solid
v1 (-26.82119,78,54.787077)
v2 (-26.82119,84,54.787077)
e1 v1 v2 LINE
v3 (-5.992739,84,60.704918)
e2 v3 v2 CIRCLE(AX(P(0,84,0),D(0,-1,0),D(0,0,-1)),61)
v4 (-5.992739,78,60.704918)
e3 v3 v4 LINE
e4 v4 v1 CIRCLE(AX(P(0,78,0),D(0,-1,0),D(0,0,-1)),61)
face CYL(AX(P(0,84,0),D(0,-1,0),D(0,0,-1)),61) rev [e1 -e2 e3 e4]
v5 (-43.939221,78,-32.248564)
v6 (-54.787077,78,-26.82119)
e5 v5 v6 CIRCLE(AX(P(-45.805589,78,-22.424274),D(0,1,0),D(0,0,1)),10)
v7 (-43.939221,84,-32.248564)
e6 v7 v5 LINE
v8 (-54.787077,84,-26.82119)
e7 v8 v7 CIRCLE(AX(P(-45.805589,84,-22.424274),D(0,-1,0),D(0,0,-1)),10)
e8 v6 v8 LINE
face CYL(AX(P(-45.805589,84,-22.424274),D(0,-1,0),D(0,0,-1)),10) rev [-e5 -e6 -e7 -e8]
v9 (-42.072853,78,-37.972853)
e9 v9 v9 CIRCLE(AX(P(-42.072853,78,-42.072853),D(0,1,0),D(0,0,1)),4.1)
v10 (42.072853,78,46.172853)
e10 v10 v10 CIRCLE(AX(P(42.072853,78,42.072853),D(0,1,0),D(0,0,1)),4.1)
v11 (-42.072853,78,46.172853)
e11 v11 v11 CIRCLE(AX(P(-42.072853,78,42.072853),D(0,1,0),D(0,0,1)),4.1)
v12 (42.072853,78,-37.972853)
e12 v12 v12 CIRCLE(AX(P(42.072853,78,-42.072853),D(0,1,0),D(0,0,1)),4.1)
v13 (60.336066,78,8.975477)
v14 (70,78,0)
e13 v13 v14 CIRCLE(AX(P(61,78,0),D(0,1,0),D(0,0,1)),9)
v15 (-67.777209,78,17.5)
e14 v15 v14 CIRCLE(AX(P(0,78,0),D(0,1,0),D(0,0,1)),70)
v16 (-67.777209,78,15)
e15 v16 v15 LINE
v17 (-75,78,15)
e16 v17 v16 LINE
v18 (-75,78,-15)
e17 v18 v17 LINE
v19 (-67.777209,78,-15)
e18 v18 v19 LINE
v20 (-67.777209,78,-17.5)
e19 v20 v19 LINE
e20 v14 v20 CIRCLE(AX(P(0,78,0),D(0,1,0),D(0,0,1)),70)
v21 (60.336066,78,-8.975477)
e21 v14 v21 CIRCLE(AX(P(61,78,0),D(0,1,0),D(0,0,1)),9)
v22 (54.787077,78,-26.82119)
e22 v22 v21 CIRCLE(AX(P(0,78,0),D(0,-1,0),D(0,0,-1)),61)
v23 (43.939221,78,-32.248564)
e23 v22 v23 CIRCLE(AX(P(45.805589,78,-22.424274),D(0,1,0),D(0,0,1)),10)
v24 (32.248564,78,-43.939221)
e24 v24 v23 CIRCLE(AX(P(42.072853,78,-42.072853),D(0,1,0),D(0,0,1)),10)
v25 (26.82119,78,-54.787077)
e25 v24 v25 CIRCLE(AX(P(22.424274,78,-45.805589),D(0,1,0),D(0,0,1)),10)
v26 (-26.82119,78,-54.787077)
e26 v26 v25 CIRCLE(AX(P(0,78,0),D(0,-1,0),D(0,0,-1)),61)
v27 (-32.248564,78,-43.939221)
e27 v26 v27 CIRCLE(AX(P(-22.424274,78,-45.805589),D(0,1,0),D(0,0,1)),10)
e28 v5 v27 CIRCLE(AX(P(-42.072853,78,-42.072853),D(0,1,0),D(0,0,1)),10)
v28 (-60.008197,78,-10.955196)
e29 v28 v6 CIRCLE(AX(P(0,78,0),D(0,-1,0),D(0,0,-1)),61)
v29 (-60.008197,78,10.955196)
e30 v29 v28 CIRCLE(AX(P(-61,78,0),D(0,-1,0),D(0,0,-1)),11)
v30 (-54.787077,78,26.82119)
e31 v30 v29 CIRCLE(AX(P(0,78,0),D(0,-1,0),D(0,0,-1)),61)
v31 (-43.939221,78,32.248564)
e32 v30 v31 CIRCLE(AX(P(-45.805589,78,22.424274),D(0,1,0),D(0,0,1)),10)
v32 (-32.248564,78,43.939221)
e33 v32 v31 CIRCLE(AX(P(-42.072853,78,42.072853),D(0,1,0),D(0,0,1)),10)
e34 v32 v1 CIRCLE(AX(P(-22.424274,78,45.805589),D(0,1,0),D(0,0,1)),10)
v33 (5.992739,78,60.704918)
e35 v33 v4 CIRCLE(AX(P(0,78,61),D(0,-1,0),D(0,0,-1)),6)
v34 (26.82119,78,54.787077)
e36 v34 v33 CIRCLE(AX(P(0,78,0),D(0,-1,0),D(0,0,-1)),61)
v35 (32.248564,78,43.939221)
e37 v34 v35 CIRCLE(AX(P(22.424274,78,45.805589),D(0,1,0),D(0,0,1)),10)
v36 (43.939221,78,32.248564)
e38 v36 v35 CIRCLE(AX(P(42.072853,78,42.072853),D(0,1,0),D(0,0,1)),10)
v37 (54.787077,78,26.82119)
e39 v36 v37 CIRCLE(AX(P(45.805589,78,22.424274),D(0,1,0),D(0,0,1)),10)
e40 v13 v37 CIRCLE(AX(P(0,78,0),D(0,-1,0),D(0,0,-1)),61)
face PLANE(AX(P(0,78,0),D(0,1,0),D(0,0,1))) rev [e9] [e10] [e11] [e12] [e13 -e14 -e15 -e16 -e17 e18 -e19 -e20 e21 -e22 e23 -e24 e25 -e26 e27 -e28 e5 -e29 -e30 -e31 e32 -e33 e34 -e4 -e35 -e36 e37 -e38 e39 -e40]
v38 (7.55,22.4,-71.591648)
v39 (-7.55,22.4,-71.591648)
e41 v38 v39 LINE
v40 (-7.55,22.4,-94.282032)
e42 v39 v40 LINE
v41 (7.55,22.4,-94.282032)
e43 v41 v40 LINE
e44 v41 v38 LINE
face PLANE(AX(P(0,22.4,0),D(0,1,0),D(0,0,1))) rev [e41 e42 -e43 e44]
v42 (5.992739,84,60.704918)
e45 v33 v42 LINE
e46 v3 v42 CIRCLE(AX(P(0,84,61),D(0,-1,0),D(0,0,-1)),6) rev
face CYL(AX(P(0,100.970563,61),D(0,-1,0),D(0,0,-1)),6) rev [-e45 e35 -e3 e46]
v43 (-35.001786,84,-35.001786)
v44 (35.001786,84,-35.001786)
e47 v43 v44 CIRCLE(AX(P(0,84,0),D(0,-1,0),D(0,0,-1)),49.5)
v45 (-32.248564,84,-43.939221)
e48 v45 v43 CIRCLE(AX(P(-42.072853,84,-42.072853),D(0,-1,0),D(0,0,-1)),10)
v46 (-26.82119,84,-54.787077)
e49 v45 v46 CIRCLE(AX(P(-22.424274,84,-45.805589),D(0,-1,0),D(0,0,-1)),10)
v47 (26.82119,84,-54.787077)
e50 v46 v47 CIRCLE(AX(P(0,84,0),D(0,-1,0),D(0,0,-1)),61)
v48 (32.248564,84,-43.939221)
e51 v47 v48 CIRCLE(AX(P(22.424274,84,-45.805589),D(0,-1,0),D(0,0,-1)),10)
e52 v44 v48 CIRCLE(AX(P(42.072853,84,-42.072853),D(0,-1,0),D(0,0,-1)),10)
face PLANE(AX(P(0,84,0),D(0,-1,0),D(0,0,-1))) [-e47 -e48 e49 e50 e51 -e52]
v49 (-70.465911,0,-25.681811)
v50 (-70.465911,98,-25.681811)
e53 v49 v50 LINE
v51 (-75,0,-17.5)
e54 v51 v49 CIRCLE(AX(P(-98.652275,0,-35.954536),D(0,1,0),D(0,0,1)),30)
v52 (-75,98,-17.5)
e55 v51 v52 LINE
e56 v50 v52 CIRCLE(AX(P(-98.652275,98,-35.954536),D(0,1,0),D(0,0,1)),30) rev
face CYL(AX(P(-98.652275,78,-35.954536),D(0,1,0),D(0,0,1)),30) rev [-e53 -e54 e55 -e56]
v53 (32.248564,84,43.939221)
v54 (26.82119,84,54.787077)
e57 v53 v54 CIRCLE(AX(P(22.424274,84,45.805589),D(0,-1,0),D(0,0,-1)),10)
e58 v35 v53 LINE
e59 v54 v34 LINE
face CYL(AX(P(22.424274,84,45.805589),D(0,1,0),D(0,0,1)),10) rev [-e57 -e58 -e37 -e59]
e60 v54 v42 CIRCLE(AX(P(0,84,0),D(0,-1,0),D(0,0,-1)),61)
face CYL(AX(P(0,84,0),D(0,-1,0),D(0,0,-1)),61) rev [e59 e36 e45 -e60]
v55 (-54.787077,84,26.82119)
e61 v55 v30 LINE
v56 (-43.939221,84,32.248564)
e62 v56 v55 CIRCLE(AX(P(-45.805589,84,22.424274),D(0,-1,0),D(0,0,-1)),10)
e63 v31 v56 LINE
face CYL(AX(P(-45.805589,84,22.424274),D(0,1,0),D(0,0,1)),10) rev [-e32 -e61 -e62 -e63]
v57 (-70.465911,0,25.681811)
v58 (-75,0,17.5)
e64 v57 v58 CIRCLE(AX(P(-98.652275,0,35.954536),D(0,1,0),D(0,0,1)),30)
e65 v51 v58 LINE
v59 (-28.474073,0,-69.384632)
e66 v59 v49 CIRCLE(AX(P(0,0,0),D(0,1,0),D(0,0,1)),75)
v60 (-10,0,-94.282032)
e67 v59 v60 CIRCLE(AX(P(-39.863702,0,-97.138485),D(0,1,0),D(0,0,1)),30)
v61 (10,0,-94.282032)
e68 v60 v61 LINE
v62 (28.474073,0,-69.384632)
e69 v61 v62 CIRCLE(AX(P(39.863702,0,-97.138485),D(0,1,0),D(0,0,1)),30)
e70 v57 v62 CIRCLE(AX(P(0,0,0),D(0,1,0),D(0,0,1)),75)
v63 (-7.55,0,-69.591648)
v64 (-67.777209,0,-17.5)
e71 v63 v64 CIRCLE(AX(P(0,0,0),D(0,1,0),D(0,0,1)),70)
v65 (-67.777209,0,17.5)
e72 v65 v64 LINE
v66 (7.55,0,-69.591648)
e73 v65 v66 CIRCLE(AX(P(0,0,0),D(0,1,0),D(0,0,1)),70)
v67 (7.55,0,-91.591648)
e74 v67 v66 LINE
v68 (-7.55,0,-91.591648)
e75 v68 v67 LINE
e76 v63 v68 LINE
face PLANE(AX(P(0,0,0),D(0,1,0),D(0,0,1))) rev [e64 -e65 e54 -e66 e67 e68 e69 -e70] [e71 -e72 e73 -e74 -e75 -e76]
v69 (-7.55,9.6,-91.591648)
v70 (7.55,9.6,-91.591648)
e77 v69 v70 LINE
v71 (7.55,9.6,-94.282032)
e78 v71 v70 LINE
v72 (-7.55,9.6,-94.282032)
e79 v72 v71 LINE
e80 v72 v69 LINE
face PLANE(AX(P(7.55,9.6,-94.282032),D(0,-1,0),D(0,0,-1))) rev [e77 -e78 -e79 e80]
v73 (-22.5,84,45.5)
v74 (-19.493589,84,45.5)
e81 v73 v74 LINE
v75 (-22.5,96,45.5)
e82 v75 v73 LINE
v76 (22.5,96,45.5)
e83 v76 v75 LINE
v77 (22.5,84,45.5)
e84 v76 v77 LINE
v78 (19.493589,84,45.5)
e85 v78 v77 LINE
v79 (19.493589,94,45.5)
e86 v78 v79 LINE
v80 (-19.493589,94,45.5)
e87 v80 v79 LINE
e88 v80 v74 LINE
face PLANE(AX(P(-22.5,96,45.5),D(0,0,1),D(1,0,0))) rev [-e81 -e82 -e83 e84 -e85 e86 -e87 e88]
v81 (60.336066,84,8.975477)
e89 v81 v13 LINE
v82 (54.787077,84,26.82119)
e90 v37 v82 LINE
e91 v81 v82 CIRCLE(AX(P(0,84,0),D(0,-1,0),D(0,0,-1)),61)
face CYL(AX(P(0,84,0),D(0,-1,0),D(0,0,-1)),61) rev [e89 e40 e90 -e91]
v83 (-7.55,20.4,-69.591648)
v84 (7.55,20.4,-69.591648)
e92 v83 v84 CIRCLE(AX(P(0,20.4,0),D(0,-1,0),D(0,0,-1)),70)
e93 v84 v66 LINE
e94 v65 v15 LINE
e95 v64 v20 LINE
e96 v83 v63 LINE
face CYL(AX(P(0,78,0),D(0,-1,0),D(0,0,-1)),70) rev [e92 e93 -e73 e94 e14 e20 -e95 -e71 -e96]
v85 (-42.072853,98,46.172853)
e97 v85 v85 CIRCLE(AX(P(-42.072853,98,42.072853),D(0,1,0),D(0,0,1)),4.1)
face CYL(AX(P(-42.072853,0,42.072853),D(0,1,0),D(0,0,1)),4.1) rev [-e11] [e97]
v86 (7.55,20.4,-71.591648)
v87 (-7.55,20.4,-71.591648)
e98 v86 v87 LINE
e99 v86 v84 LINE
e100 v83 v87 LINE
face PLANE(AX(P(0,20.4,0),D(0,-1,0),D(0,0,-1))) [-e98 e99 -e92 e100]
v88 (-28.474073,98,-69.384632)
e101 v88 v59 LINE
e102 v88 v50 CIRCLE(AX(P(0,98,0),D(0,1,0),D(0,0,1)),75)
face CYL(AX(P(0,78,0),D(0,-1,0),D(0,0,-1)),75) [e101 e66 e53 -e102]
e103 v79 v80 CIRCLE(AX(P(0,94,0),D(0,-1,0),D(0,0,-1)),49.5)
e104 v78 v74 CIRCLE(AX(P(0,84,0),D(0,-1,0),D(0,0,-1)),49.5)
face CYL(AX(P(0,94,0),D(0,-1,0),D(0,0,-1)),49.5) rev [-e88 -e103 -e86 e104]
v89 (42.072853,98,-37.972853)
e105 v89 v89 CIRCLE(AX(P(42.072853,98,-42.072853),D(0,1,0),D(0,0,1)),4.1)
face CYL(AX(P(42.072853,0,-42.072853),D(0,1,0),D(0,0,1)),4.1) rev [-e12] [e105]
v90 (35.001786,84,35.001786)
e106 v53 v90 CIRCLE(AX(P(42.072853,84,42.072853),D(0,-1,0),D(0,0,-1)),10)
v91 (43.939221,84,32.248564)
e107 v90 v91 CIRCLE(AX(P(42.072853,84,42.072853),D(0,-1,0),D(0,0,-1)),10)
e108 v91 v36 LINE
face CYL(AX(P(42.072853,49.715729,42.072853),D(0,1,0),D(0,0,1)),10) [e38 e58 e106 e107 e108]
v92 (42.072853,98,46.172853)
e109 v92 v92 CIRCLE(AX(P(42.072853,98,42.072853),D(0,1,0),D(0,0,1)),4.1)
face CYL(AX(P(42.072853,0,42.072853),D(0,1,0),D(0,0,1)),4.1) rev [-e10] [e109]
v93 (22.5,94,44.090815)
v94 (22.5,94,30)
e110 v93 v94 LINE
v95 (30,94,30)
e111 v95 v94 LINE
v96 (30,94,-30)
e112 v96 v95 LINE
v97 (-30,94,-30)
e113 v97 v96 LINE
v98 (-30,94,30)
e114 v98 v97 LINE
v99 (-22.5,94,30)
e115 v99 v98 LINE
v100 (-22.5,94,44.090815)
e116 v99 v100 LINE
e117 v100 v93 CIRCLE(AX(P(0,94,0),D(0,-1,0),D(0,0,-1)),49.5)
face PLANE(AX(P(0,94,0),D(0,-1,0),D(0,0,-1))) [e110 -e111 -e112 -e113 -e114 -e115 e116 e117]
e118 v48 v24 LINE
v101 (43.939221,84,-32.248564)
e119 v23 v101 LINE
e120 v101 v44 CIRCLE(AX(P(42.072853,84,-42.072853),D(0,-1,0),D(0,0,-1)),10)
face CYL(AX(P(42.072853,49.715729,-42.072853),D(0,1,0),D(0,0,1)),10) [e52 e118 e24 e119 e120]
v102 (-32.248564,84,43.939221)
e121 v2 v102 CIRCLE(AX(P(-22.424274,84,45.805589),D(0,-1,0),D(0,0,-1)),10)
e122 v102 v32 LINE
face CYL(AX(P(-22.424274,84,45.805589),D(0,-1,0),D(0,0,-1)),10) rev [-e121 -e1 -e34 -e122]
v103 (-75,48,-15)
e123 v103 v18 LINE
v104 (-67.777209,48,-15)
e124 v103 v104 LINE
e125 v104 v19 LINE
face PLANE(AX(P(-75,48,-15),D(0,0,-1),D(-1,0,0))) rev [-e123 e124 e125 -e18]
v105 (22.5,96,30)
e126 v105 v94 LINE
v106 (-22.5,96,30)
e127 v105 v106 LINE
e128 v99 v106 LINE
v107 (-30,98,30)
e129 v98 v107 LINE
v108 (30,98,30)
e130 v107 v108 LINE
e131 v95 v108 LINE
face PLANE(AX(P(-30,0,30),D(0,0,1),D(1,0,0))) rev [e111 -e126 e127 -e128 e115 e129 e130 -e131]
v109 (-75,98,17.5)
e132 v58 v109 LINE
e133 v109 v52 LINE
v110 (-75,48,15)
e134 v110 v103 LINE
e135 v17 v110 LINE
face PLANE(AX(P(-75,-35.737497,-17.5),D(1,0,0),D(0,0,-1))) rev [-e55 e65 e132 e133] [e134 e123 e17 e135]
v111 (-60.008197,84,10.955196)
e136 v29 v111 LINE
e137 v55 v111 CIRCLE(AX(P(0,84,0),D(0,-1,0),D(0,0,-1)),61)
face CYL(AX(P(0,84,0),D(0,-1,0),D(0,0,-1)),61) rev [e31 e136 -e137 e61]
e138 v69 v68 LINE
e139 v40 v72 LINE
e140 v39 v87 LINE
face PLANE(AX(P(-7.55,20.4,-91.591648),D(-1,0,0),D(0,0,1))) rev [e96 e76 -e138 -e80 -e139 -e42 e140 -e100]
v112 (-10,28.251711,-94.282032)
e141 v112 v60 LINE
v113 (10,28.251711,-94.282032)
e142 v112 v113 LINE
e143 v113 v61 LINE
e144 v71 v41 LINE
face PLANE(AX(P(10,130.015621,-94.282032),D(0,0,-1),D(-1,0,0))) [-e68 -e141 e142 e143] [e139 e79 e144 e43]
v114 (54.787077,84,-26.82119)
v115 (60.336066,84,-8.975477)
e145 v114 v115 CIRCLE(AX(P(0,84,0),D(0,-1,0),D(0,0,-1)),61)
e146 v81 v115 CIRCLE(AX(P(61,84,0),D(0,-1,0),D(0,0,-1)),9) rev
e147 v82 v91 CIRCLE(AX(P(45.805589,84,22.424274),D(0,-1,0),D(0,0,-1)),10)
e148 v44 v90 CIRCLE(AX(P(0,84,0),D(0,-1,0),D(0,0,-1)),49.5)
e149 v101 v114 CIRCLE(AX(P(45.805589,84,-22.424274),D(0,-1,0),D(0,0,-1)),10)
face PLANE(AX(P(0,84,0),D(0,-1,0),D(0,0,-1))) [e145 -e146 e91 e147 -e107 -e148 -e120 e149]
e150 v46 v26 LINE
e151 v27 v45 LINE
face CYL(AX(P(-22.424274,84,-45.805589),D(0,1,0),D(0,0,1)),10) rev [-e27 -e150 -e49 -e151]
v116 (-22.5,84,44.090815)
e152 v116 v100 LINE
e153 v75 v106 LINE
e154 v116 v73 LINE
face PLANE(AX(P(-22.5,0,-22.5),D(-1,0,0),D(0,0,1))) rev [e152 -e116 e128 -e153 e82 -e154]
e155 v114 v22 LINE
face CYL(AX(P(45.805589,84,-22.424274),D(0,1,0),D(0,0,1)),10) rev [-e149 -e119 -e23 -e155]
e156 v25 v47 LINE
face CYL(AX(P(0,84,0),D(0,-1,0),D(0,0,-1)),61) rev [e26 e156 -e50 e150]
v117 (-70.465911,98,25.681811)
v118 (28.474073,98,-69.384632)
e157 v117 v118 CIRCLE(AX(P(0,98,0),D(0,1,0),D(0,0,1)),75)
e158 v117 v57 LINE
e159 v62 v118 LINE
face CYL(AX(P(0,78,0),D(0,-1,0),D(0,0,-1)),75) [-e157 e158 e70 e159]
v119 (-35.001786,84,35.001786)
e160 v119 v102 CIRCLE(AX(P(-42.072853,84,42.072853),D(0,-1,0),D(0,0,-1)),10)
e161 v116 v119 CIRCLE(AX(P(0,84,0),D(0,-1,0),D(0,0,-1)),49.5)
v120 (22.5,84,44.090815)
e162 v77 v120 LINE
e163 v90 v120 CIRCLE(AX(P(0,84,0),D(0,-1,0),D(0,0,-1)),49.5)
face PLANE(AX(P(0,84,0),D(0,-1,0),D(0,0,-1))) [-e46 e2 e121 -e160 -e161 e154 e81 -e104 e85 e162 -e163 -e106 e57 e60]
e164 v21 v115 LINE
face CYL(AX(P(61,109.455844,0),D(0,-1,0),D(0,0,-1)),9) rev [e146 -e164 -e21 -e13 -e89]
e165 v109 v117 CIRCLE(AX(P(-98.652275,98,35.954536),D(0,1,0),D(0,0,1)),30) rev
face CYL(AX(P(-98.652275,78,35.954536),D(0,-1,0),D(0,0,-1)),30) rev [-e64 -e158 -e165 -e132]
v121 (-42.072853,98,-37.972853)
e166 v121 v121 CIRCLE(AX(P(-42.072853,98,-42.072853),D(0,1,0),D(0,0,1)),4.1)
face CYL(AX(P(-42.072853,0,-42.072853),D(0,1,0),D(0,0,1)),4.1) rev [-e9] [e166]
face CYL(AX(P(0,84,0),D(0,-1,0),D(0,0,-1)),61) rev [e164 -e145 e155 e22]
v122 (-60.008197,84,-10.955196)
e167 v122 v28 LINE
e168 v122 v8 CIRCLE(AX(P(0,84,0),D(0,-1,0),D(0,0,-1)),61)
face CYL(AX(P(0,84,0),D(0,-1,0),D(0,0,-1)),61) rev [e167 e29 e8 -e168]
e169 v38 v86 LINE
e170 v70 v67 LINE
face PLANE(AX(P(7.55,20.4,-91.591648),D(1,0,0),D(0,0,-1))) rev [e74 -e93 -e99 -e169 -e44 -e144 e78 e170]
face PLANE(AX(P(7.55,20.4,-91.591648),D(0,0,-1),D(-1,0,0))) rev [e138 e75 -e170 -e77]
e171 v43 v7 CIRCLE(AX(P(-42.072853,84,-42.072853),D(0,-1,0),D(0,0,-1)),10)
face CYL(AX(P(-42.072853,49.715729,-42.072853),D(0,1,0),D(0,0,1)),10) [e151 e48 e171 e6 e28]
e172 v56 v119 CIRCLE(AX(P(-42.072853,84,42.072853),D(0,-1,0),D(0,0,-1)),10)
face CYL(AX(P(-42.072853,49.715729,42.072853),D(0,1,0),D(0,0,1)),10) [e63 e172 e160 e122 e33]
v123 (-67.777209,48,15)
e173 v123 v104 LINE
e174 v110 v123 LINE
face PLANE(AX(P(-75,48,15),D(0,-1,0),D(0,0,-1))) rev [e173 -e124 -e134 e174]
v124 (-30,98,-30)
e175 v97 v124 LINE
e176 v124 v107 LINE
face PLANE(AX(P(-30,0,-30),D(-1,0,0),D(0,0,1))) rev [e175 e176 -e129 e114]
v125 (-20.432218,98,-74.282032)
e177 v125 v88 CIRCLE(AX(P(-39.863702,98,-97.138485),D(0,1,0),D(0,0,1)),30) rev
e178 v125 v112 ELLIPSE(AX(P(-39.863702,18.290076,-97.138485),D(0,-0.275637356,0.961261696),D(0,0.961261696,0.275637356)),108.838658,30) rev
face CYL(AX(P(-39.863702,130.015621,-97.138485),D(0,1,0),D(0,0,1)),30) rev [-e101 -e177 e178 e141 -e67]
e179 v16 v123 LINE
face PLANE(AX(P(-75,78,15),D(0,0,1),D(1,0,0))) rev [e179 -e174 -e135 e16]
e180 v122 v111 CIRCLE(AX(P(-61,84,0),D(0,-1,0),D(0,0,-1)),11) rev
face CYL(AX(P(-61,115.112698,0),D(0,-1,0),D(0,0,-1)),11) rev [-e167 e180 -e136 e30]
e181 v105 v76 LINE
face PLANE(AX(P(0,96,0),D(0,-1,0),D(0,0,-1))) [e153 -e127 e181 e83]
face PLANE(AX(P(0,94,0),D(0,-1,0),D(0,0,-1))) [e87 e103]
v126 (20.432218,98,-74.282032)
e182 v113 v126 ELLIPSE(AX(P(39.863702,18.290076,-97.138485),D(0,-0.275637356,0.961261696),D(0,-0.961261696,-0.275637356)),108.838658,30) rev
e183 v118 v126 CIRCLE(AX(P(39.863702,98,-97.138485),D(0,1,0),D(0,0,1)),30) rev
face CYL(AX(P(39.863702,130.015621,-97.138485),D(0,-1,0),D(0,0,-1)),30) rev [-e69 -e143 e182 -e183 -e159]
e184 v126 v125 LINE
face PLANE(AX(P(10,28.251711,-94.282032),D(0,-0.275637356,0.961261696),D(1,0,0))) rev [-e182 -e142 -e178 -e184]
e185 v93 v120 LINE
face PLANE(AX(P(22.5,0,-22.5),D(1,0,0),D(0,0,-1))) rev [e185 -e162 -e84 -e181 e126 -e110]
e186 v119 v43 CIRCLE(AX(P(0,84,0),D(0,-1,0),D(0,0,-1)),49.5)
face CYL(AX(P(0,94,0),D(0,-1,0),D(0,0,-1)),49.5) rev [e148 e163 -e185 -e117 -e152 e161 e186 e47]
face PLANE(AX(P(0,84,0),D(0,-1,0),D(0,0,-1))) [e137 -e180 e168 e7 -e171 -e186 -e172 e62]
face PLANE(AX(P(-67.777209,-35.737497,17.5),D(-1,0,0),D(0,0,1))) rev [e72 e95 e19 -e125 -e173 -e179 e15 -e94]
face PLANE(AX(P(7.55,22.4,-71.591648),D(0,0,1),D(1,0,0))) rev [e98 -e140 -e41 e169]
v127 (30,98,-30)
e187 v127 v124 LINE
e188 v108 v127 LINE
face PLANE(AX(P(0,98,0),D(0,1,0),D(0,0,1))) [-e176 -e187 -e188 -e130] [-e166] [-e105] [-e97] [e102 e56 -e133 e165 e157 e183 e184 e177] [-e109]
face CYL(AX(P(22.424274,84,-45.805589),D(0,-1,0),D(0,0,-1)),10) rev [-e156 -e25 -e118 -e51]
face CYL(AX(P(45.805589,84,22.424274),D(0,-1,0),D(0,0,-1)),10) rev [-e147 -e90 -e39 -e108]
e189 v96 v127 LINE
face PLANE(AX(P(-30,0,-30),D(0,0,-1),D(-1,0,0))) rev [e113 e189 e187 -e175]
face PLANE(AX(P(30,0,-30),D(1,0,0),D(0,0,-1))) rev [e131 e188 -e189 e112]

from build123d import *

# Parameters (mm, degrees)
SKETCH1_R               = 75
SKETCH1_R_2             = 70
BOSS_EXTRUDE1_DEPTH     = 78
SKETCH2_R               = 75
BOSS_EXTRUDE2_DEPTH     = 20
SKETCH3_R               = 4.1
SKETCH3_W               = 45
SKETCH3_H               = 45
CUT_EXTRUDE1_DEPTH      = 145.409140985
SKETCH5_W               = 45
SKETCH5_H               = 23
CUT_EXTRUDE2_DEPTH      = 18
SKETCH6_R               = 61
CUT_EXTRUDE3_DEPTH      = 6
SKETCH7_R               = 10
SKETCH7_R_2             = 4.1
BOSS_EXTRUDE3_DEPTH     = 6
SKETCH8_R               = 49.5
CUT_EXTRUDE4_DEPTH      = 10
CUT_EXTRUDE5_DEPTH      = 145.409140985
CUT_EXTRUDE5_DEPTH_BACK = 145.409140985
SKETCH10_W              = 15
SKETCH10_H              = 12.8
CUT_EXTRUDE6_DEPTH      = 10
CUT_EXTRUDE7_START      = -3
SKETCH11_W              = 20
SKETCH11_H              = 20
CUT_EXTRUDE7_DEPTH      = 10
CUT_EXTRUDE9_DEPTH      = 132.658649545
CUT_EXTRUDE9_DEPTH_BACK = 6
SKETCH13_R              = 9
BOSS_EXTRUDE4_DEPTH     = 98
SKETCH15_W              = 15.1
SKETCH15_H              = 22
CUT_EXTRUDE10_DEPTH     = 20.4
FILLET1_R               = 30
SKETCH16_W              = 15.1
SKETCH16_H              = 20
CUT_EXTRUDE11_DEPTH     = 2
SKETCH17_W              = 15.1
SKETCH17_H              = 12.8
CUT_EXTRUDE12_DEPTH     = 208.32046993
CHAMFER1_SIZE           = 20
CHAMFER1_SIZE2          = 69.748288877
CUT_EXTRUDE13_START     = -20
SKETCH20_W              = 10
SKETCH20_H              = 30
CUT_EXTRUDE13_DEPTH     = 30
BOSS_EXTRUDE6_START     = -48.000001
SKETCH21_W              = 7.222791441
SKETCH21_H              = 35
BOSS_EXTRUDE6_DEPTH     = 98.000001
SKETCH22_W              = 30
SKETCH22_H              = 30
CUT_EXTRUDE15_DEPTH     = 198.176147378
FILLET2_R               = 30
SKETCH23_W              = 60
SKETCH23_H              = 60
CUT_EXTRUDE16_DEPTH     = 156.300037396
SKETCH25_R              = 6
CUT_EXTRUDE17_DEPTH     = 6
SKETCH26_R              = 11
CUT_EXTRUDE18_DEPTH     = 6
FILLET4_R               = 10


with BuildPart() as part:
    # Sketch1 → Boss-Extrude1 (new body)
    with BuildSketch(Plane(origin=(0, 0, 0), x_dir=(1, 0, 0), z_dir=(0, 1, 0))):
        with Locations(Location((0, 0, 0), (0, 0, 270))):
            Circle(SKETCH1_R)
        with Locations(Location((0, 0, 0), (0, 0, 270))):
            Circle(SKETCH1_R_2, mode=Mode.SUBTRACT)
    extrude(amount=BOSS_EXTRUDE1_DEPTH)

    # Sketch2 → Boss-Extrude2 (add)
    with BuildSketch(Plane(origin=(0, 78, 0), x_dir=(1, 0, 0), z_dir=(0, 1, 0))):
        with Locations(Location((0, 0, 0), (0, 0, 270))):
            Circle(SKETCH2_R)
    extrude(amount=BOSS_EXTRUDE2_DEPTH)

    # Sketch3 → Cut-Extrude1 (cut, through all)
    with BuildSketch(Plane(origin=(0, 98, 0), x_dir=(1, 0, 0), z_dir=(0, 1, 0))):
        with Locations(Location((-42.072853481, -42.072853481, 0), (0, 0, 270))):
            Circle(SKETCH3_R)
        with Locations(Location((-42.072853481, 42.072853481, 0), (0, 0, 270))):
            Circle(SKETCH3_R)
        with Locations(Location((42.072853481, 42.072853481, 0), (0, 0, 270))):
            Circle(SKETCH3_R)
        with Locations(Location((42.072853481, -42.072853481, 0), (0, 0, 270))):
            Circle(SKETCH3_R)
        Rectangle(SKETCH3_W, SKETCH3_H)
    extrude(amount=-CUT_EXTRUDE1_DEPTH, mode=Mode.SUBTRACT)

    # Sketch5 → Cut-Extrude2 (cut)
    with BuildSketch(Plane.XZ.offset(-78)):
        with Locations((0, 34)):
            Rectangle(SKETCH5_W, SKETCH5_H)
    extrude(amount=-CUT_EXTRUDE2_DEPTH, mode=Mode.SUBTRACT)

    # Sketch6 → Cut-Extrude3 (cut)
    with BuildSketch(Plane.XZ.offset(-78)):
        Circle(SKETCH6_R)
    extrude(amount=-CUT_EXTRUDE3_DEPTH, mode=Mode.SUBTRACT)

    # Sketch7 → Boss-Extrude3 (add)
    # profile 1 of 4: a face of its own
    with BuildSketch(Plane.XZ.offset(-84)):
        with Locations((-42.072853481, -42.072853481)):
            Circle(SKETCH7_R)
        with Locations(Location((-42.072853481, -42.072853481, 0), (0, 0, 90))):
            Circle(SKETCH7_R_2, mode=Mode.SUBTRACT)
    # profile 2 of 4: a face of its own
    with BuildSketch(Plane.XZ.offset(-84)):
        with Locations((-42.072853481, 42.072853481)):
            Circle(SKETCH7_R)
        with Locations(Location((-42.072853481, 42.072853481, 0), (0, 0, 90))):
            Circle(SKETCH7_R_2, mode=Mode.SUBTRACT)
    # profile 3 of 4: a face of its own
    with BuildSketch(Plane.XZ.offset(-84)):
        with Locations((42.072853481, -42.072853481)):
            Circle(SKETCH7_R)
        with Locations(Location((42.072853481, -42.072853481, 0), (0, 0, 90))):
            Circle(SKETCH7_R_2, mode=Mode.SUBTRACT)
    # profile 4 of 4: a face of its own
    with BuildSketch(Plane.XZ.offset(-84)):
        with Locations((42.072853481, 42.072853481)):
            Circle(SKETCH7_R)
        with Locations(Location((42.072853481, 42.072853481, 0), (0, 0, 90))):
            Circle(SKETCH7_R_2, mode=Mode.SUBTRACT)
    extrude(amount=BOSS_EXTRUDE3_DEPTH)

    # Sketch8 → Cut-Extrude4 (cut)
    with BuildSketch(Plane.XZ.offset(-84)):
        Circle(SKETCH8_R)
    extrude(amount=-CUT_EXTRUDE4_DEPTH, mode=Mode.SUBTRACT)

    # Sketch9 → Cut-Extrude5 (cut, two sides: drawn at the far end of the back side and taken through both)
    with BuildSketch(Plane.XZ.offset(-CUT_EXTRUDE5_DEPTH_BACK)):
        Polygon((359.222745321, -74.624057783), (7.5, -74.624057783), (-7.5, -74.624057783), (-359.222745321, -74.624057783), (-359.222745321, -778.069548425), (359.222745321, -778.069548425), align=None)
    extrude(amount=CUT_EXTRUDE5_DEPTH + CUT_EXTRUDE5_DEPTH_BACK, mode=Mode.SUBTRACT)

    # Sketch10 → Cut-Extrude6 (cut)
    with BuildSketch(Plane(origin=(0, 0, -74.624057783), x_dir=(-1, 0, 0), z_dir=(0, 0, -1))):
        with Locations((0, 14)):
            Rectangle(SKETCH10_W, SKETCH10_H)
    extrude(amount=-CUT_EXTRUDE6_DEPTH, mode=Mode.SUBTRACT)

    # Sketch11 → Cut-Extrude7 (cut)
    with BuildSketch(Plane(origin=(0, 0, -74.624057783), x_dir=(-1, 0, 0), z_dir=(0, 0, -1)).offset(CUT_EXTRUDE7_START)):
        with Locations((0, 14)):
            Rectangle(SKETCH11_W, SKETCH11_H)
    extrude(amount=-CUT_EXTRUDE7_DEPTH, mode=Mode.SUBTRACT)

    # Sketch13 → Cut-Extrude9 (cut, two sides: drawn at the far end of the back side and taken through both)
    with BuildSketch(Plane.XZ.offset(-78).offset(-CUT_EXTRUDE9_DEPTH_BACK)):
        with Locations((61, 0)):
            Circle(SKETCH13_R)
    extrude(amount=CUT_EXTRUDE9_DEPTH + CUT_EXTRUDE9_DEPTH_BACK, mode=Mode.SUBTRACT)

    # Sketch14 → Boss-Extrude4 (add)
    with BuildSketch(Plane.XZ):
        with BuildLine():
            Line((10, -94.282032303), (-10, -94.282032303))
            Line((-10, -94.282032303), (-10, -69.282032303))
            ThreePointArc((-10, -69.282032303), (0, -70), (10, -69.282032303))
            Line((10, -69.282032303), (10, -94.282032303))
        make_face()
    extrude(amount=-BOSS_EXTRUDE4_DEPTH)

    # Sketch15 → Cut-Extrude10 (cut)
    with BuildSketch(Plane.XZ):
        with Locations((0, -80.591648206)):
            Rectangle(SKETCH15_W, SKETCH15_H)
    extrude(amount=-CUT_EXTRUDE10_DEPTH, mode=Mode.SUBTRACT)

    # Fillet1
    # the kernel refuses this fillet: 30 mm, written as the material it adds along each edge
    with BuildSketch(Plane(origin=(10, 98, -74.330343737), x_dir=(0, 0, -1), z_dir=(0, -1, 0))) as fillet1_piece_1:
        with BuildLine():
            CenterArc((22.808141372, 29.863701669), FILLET1_R, 202.312270951, 62.224029165)
            Line((-4.945711516, 18.474072621), (-5.500788574, 18.24628004))
            ThreePointArc((-5.500788574, 18.24628004), (-2.46118345, 9.240161115), (-0.59464275, -0.08))
            Line((-0.59464275, -0.08), (0, -0.6))
            ThreePointArc((0, -0.6), (9.975844283, -0.6), (19.89455951, -0.597274033))
            Line((19.89455951, -0.597274033), (19.951688566, 0))
        make_face()
    extrude(amount=98)
    with BuildSketch(Plane(origin=(-10, 98, -74.330343737), x_dir=(0, 0, -1), z_dir=(0, -1, 0))) as fillet1_piece_2:
        with BuildLine():
            CenterArc((22.808141372, -29.863701669), FILLET1_R, 95.463699883, 62.224029165)
            Line((-4.945711516, -18.474072621), (-5.500788574, -18.24628004))
            ThreePointArc((-5.500788574, -18.24628004), (-2.46118345, -9.240161115), (-0.59464275, 0.08))
            Line((-0.59464275, 0.08), (0, 0.6))
            ThreePointArc((0, 0.6), (9.975844283, 0.6), (19.89455951, 0.597274033))
            Line((19.89455951, 0.597274033), (19.951688566, 0))
        make_face()
    extrude(amount=98)

    # Sketch16 → Cut-Extrude11 (cut)
    with BuildSketch(Plane.XZ.offset(-20.4)):
        with Locations((0, -81.591648206)):
            Rectangle(SKETCH16_W, SKETCH16_H)
    extrude(amount=-CUT_EXTRUDE11_DEPTH, mode=Mode.SUBTRACT)

    # Sketch17 → Cut-Extrude12 (cut, through all)
    with BuildSketch(Plane.XY.offset(-91.591648206)):
        with Locations((0, 16)):
            Rectangle(SKETCH17_W, SKETCH17_H)
    extrude(amount=-CUT_EXTRUDE12_DEPTH, mode=Mode.SUBTRACT)

    # Chamfer1
    chamfer1_edges = [part.edges().sort_by_distance(p)[0] for p in [
        (0, 98, -94.282032303),
    ]]
    chamfer1_side = [part.faces().sort_by_distance(p)[0] for p in [
        (-13.95523156, 98, -77.914190335),
    ]]
    chamfer(chamfer1_edges, length=CHAMFER1_SIZE, length2=CHAMFER1_SIZE2, reference=chamfer1_side[0])

    # Sketch20 → Cut-Extrude13 (cut)
    with BuildSketch(Plane.XZ.offset(CUT_EXTRUDE13_START)):
        with Locations((-70, 0)):
            Rectangle(SKETCH20_W, SKETCH20_H)
    extrude(amount=-CUT_EXTRUDE13_DEPTH, mode=Mode.SUBTRACT)

    # Sketch21 → Boss-Extrude6 (add)
    with BuildSketch(Plane.XZ.offset(-50).offset(BOSS_EXTRUDE6_START)):
        with Locations((-71.38860428, 0)):
            Rectangle(SKETCH21_W, SKETCH21_H)
    extrude(amount=BOSS_EXTRUDE6_DEPTH)

    # Sketch22 → Cut-Extrude15 (cut, through all)
    with BuildSketch(Plane(origin=(-67.777208559, 0, 0), x_dir=(0, 0, -1), z_dir=(1, 0, 0))):
        with Locations((0, 63)):
            Rectangle(SKETCH22_W, SKETCH22_H)
    extrude(amount=-CUT_EXTRUDE15_DEPTH, mode=Mode.SUBTRACT)

    # Fillet2
    # the kernel refuses this fillet: 30 mm, written as the material it adds along each edge
    with BuildSketch(Plane(origin=(-72.929760729, 98, -17.5), x_dir=(0.2883469649842646, 0, -0.9575259932682575), z_dir=(0, -1, 0))) as fillet2_piece_1:
        with BuildLine():
            CenterArc((10.253688675, -29.951285387), FILLET2_R, 93.265618259, 17.938271436)
            Line((-0.596947211, -1.982307914), (-0.813959928, -1.422928365))
            ThreePointArc((-0.813959928, -1.422928365), (-0.872989201, -0.818145778), (-0.574515596, 0.173008179))
            Line((-0.574515596, 0.173008179), (0.034178962, 0.599025708))
            ThreePointArc((0.034178962, 0.599025708), (4.272370281, 0.478213468), (8.5105616, 0.599025708))
            Line((8.5105616, 0.599025708), (8.544740562, 0))
        make_face()
    extrude(amount=98)
    with BuildSketch(Plane(origin=(-72.929760729, 98, 17.5), x_dir=(-1, 0, 0), z_dir=(0, -1, 0))) as fillet2_piece_2:
        with BuildLine():
            CenterArc((25.722514281, -18.454535672), FILLET2_R, 142.037093224, 17.938271436)
            Line((-2.463850008, -8.181811194), (-3.027577293, -7.976356704))
            ThreePointArc((-3.027577293, -7.976356704), (-1.68982683, -3.953014195), (-0.583438086, 0.14))
            Line((-0.583438086, 0.14), (0, 0.6))
            ThreePointArc((0, 0.6), (1.035119635, 0.6), (1.597193771, 0.369090713))
            Line((1.597193771, 0.369090713), (2.070239271, 0))
        make_face()
    extrude(amount=98)

    # Sketch23 → Cut-Extrude16 (cut, through all)
    with BuildSketch(Plane(origin=(0, 98, 0), x_dir=(1, 0, 0), z_dir=(0, 1, 0))):
        Rectangle(SKETCH23_W, SKETCH23_H)
    extrude(amount=-CUT_EXTRUDE16_DEPTH, mode=Mode.SUBTRACT)

    # Sketch25 → Cut-Extrude17 (cut)
    with BuildSketch(Plane.XZ.offset(-78)):
        with Locations((0, 61)):
            Circle(SKETCH25_R)
    extrude(amount=-CUT_EXTRUDE17_DEPTH, mode=Mode.SUBTRACT)

    # Sketch26 → Cut-Extrude18 (cut)
    with BuildSketch(Plane.XZ.offset(-78)):
        with Locations((-61, 0)):
            Circle(SKETCH26_R)
    extrude(amount=-CUT_EXTRUDE18_DEPTH, mode=Mode.SUBTRACT)

    # Fillet4
    fillet4_edges = [part.edges().sort_by_distance(p)[0] for p in [
        (-49.607445277, 81, -35.497906602),
        (-35.497906602, 81, -49.607445277),
        (-35.497906602, 81, 49.607445277),
        (-49.607445277, 81, 35.497906602),
        (49.607445277, 81, -35.497906602),
        (35.497906602, 81, -49.607445277),
        (49.607445277, 81, 35.497906602),
        (35.497906602, 81, 49.607445277),
    ]]
    fillet(fillet4_edges, radius=FILLET4_R)


solid = part.part
